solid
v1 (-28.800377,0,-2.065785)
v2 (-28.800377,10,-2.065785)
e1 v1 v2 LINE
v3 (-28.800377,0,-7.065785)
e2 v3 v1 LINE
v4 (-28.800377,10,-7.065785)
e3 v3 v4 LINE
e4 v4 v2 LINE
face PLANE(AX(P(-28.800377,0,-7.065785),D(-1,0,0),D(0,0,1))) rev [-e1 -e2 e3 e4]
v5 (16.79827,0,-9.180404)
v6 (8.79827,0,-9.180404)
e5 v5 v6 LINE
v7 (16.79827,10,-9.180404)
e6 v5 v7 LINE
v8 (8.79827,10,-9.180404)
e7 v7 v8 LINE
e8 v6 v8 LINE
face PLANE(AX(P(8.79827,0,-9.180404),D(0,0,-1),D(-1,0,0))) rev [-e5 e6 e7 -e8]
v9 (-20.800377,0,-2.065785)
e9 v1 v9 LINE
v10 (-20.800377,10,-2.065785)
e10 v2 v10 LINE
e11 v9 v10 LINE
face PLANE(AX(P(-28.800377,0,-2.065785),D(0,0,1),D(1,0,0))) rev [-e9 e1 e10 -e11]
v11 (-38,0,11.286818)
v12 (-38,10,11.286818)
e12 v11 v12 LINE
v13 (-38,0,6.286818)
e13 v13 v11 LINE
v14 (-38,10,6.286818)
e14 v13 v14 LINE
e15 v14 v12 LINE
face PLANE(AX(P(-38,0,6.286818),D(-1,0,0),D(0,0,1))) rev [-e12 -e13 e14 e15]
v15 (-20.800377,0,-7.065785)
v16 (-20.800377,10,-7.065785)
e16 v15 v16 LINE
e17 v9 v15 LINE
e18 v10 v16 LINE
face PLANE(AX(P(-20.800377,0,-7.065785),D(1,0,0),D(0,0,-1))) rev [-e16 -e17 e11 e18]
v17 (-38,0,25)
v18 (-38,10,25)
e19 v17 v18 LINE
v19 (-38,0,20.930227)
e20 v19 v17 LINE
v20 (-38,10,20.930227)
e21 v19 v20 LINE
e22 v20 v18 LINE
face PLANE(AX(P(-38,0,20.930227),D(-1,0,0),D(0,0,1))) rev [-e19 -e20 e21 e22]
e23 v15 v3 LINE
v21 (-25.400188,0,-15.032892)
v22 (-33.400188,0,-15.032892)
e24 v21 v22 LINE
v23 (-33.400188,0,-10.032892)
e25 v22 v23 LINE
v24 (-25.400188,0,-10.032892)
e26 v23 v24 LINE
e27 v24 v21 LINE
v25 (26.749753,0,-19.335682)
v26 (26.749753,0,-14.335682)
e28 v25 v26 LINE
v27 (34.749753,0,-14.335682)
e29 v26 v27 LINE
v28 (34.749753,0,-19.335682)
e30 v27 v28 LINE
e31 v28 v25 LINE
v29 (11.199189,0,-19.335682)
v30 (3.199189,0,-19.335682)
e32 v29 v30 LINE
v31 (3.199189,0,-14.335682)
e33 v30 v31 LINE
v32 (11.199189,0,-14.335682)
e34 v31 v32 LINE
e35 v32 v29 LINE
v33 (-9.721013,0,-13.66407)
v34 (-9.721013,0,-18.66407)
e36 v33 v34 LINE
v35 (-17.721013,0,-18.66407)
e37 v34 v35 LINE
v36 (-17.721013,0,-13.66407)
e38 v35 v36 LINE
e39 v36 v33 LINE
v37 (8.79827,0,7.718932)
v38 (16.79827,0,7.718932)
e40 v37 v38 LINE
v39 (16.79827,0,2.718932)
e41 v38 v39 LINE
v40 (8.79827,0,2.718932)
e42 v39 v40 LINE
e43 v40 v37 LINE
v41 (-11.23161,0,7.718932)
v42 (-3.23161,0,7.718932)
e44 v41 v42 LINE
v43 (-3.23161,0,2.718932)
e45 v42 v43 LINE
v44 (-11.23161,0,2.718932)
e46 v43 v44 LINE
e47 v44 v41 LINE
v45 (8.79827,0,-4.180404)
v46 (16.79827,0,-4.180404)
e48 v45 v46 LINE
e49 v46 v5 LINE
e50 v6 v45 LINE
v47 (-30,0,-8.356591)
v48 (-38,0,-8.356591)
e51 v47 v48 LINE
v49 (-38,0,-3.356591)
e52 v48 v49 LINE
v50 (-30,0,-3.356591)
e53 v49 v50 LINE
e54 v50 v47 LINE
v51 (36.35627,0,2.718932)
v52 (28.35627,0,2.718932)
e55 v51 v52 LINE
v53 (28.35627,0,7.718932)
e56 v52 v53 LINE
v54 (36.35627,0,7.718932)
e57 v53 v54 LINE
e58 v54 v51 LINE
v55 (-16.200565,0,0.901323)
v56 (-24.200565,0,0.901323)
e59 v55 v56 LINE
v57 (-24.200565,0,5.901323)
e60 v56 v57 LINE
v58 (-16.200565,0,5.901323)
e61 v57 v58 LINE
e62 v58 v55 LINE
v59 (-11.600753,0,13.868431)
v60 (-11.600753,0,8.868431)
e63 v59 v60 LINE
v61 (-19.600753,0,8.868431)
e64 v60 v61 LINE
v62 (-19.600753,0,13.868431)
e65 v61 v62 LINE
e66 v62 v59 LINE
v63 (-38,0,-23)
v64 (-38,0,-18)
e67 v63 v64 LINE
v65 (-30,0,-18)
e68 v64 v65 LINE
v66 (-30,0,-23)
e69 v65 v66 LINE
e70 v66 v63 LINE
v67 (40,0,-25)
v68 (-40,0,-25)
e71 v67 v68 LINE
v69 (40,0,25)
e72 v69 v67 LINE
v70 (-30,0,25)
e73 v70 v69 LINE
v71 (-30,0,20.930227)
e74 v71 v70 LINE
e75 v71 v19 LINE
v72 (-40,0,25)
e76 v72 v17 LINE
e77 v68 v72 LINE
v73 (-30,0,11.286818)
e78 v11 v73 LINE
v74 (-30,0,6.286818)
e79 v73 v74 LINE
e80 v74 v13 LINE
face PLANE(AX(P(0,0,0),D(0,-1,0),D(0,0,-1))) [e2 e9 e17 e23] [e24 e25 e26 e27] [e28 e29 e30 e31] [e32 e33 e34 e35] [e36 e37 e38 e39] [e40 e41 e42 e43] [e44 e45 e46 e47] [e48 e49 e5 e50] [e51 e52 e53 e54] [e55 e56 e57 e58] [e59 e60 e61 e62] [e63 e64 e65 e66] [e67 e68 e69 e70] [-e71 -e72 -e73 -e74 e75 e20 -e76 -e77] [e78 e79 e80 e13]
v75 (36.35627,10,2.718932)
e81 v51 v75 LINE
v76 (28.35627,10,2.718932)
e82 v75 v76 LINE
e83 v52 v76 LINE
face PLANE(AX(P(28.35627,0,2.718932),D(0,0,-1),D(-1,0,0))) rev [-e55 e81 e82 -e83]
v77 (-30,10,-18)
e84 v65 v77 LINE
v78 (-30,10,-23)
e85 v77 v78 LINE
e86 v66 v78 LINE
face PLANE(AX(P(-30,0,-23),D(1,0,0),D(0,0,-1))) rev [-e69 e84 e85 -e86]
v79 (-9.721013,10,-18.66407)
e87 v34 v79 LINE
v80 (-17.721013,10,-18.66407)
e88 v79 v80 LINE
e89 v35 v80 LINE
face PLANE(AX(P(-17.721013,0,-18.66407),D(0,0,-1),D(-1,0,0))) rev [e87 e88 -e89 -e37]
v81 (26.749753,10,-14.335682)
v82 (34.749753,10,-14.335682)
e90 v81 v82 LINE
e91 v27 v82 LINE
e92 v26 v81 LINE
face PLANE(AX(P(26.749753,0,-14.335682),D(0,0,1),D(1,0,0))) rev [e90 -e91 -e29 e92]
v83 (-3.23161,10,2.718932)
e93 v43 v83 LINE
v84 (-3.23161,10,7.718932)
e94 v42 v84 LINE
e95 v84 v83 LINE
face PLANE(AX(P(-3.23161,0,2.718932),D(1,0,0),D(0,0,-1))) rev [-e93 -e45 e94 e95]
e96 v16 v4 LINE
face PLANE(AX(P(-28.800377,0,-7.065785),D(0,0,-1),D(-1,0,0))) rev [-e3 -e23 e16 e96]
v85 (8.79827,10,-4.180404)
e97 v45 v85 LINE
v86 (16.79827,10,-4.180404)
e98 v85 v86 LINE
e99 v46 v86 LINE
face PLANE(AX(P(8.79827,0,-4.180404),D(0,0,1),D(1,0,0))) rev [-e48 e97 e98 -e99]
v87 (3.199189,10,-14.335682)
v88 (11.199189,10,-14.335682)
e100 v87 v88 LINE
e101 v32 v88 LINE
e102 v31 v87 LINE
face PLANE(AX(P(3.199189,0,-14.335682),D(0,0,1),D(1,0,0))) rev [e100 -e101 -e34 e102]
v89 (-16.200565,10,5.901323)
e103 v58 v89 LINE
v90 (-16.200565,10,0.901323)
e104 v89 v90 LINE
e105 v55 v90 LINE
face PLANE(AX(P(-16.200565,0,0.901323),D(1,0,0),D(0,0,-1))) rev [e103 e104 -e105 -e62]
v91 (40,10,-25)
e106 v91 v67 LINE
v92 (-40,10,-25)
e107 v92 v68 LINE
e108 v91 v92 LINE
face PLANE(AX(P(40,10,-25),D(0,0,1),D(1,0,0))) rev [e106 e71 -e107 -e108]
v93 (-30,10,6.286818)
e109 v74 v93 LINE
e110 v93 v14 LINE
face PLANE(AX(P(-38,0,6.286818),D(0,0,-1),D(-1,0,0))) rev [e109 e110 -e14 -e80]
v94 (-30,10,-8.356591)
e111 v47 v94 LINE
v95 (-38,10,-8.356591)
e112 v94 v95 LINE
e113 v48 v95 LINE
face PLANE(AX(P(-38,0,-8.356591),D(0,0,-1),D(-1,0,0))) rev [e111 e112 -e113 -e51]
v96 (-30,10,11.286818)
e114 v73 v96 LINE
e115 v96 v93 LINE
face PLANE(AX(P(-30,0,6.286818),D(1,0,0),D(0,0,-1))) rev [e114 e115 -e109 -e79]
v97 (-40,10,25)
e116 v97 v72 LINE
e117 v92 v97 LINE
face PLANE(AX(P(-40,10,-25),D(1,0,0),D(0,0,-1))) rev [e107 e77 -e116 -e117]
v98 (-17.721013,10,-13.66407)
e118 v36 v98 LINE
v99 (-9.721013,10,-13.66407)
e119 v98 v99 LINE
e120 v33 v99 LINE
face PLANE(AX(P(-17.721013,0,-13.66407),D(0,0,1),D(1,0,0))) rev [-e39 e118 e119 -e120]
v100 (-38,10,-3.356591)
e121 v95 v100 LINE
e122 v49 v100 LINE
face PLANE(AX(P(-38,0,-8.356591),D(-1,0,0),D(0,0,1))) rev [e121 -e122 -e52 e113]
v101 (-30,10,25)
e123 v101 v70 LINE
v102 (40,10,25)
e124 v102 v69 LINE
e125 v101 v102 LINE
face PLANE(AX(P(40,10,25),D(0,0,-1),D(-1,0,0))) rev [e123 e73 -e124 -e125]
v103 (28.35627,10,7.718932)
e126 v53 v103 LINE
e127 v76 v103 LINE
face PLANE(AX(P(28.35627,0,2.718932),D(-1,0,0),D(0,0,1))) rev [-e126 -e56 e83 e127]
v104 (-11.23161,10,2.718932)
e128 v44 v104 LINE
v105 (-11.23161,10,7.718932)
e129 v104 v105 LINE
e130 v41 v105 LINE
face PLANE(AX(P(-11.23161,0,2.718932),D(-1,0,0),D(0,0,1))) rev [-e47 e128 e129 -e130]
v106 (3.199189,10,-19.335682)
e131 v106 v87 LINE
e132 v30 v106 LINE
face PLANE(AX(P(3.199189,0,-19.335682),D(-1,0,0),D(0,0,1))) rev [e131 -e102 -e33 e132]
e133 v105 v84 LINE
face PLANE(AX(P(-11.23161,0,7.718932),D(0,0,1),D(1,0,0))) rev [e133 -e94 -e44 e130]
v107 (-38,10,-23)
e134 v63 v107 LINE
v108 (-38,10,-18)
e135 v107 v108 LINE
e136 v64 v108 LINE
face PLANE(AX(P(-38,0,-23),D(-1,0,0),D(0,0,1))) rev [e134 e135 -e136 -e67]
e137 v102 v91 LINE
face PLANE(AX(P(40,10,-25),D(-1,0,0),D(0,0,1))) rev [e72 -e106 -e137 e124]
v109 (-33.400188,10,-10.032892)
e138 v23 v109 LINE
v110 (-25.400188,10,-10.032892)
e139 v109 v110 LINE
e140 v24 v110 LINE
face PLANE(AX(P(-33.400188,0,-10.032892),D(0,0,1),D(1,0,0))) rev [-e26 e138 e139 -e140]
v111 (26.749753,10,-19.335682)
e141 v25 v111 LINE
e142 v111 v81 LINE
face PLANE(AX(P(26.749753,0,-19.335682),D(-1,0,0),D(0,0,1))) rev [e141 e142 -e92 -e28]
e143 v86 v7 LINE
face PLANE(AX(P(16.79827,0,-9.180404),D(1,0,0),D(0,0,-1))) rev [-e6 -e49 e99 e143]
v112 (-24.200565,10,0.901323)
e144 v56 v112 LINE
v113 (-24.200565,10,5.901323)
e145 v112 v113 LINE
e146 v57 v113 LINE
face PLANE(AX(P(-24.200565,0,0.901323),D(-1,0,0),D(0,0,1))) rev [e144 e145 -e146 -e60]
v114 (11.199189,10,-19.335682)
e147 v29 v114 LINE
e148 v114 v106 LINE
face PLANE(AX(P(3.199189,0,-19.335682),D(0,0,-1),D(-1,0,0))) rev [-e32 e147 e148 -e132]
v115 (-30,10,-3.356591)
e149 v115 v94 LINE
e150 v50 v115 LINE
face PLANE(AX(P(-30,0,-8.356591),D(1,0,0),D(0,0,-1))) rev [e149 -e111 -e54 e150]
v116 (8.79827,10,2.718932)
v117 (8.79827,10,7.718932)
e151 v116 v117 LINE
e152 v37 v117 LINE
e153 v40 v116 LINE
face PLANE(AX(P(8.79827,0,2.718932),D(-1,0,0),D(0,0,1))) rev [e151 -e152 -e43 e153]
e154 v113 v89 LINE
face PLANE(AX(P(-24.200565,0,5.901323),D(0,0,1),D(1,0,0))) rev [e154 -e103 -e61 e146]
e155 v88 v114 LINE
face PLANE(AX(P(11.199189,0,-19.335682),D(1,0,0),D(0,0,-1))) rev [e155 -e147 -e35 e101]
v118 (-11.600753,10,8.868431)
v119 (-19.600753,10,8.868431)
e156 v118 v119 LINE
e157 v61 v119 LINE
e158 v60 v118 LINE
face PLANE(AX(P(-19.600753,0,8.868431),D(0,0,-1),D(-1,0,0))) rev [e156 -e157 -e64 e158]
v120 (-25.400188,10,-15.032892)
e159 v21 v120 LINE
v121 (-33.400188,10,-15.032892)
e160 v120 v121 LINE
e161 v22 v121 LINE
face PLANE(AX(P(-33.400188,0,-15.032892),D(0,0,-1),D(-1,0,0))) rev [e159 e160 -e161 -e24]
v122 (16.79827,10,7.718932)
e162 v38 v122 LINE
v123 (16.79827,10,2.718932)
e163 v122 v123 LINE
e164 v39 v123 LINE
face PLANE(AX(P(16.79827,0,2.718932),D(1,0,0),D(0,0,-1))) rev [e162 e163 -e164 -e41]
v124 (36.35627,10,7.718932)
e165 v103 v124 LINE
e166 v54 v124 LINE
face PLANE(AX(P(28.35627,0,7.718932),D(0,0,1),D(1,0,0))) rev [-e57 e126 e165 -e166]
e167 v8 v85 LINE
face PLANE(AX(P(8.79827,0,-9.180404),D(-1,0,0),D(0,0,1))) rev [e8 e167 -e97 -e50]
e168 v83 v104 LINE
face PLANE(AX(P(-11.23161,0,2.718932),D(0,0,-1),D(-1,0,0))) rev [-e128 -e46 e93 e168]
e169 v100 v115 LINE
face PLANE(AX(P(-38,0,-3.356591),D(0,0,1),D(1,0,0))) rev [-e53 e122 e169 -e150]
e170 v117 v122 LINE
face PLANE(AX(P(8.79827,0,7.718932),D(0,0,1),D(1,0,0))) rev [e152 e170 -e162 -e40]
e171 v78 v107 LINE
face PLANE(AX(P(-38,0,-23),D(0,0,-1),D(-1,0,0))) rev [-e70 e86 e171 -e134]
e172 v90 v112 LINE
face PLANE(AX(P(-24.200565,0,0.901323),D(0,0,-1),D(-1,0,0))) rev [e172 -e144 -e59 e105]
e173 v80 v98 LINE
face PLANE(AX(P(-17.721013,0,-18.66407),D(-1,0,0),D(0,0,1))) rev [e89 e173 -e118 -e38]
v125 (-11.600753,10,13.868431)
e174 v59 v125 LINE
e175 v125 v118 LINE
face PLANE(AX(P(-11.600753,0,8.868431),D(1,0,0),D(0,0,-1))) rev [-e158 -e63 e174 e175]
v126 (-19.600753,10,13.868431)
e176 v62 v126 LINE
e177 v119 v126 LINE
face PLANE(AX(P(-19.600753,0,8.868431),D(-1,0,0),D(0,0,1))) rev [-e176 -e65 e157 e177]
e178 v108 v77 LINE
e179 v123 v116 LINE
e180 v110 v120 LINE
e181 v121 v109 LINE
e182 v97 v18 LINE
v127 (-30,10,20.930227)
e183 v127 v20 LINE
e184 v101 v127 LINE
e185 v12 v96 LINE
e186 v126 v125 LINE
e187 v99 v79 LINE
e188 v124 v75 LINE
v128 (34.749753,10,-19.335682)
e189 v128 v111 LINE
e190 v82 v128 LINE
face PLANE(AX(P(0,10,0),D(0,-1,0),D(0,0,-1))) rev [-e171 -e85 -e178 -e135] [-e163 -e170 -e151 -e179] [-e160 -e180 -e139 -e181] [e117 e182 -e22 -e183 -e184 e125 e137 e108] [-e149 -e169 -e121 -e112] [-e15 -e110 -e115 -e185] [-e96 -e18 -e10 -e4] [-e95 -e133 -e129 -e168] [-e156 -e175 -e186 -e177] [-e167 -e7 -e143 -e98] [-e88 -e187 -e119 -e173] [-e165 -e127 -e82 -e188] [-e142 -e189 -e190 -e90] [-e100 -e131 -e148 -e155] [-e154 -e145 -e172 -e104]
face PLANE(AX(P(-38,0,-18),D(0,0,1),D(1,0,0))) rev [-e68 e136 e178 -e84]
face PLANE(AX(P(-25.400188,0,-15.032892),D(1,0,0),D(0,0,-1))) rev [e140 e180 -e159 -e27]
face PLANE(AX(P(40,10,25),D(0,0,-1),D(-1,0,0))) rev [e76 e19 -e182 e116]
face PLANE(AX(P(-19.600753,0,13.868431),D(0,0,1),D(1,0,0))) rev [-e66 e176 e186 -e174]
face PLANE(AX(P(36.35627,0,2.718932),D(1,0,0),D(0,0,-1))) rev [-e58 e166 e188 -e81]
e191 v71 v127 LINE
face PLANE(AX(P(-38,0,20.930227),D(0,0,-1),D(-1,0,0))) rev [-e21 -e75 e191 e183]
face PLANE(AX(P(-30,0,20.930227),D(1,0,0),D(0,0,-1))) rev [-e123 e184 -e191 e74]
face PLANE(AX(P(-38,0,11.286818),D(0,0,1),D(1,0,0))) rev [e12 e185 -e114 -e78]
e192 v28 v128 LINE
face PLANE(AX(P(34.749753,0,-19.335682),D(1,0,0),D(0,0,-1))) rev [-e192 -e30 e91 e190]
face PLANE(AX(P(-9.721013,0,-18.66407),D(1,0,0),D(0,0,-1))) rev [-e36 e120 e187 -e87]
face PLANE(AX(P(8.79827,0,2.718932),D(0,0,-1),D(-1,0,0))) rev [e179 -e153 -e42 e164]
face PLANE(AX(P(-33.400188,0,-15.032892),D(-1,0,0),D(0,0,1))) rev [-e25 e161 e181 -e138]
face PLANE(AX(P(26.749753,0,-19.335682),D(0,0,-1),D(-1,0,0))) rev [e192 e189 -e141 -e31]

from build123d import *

# Parameters (mm, degrees)
SKETCH1_W               = 80
SKETCH1_H               = 50
BOSS_EXTRUDE1_DEPTH     = 10
SKETCH2_W               = 8
SKETCH2_H               = 5
CUT_EXTRUDE1_DEPTH      = 49.218253805
CRVPATTERN4_START       = -38
CRVPATTERN4_OUTLINE_W   = 10
CRVPATTERN4_OUTLINE_H   = 4.069772856
CRVPATTERN4_OUTLINE_H_2 = 5
CRVPATTERN4_DEPTH       = 8
CRVPATTERN5_COUNT       = 5
CRVPATTERN5_PITCH       = 9.199623468


# Read off the part's stored shape, not the designer's step: CrvPattern4
with BuildPart() as part:
    # Sketch1 → Boss-Extrude1 (new body)
    with BuildSketch(Plane(origin=(0, 0, 0), x_dir=(1, 0, 0), z_dir=(0, 1, 0))):
        Rectangle(SKETCH1_W, SKETCH1_H)
    extrude(amount=BOSS_EXTRUDE1_DEPTH)

    # Sketch2 → Cut-Extrude1 (cut, through all)
    with BuildSketch(Plane(origin=(0, 10, 0), x_dir=(1, 0, 0), z_dir=(0, 1, 0))):
        with Locations((-34, 20.5)):
            Rectangle(SKETCH2_W, SKETCH2_H)
    cut_extrude1 = extrude(amount=-CUT_EXTRUDE1_DEPTH, mode=Mode.SUBTRACT)

    # CrvPattern4 outline → CrvPattern4 (cut)
    with BuildSketch(Plane.YZ.offset(CRVPATTERN4_START)):
        with Locations((5, 22.965113572)):
            Rectangle(CRVPATTERN4_OUTLINE_W, CRVPATTERN4_OUTLINE_H)
        with Locations((5, 8.786818096)):
            Rectangle(CRVPATTERN4_OUTLINE_W, CRVPATTERN4_OUTLINE_H_2)
        with Locations((5, -5.856590952)):
            Rectangle(CRVPATTERN4_OUTLINE_W, CRVPATTERN4_OUTLINE_H_2)
    extrude(amount=CRVPATTERN4_DEPTH, mode=Mode.SUBTRACT)

    # CrvPattern5: Cut-Extrude1 ×5
    with Locations(*[Vector(0.4999999999066592, 0, 0.866025403838329) * (i * CRVPATTERN5_PITCH) for i in range(1, CRVPATTERN5_COUNT)]):
        add(cut_extrude1, mode=Mode.SUBTRACT)

    # Sketch-Pattern1: Cut-Extrude1 at 7 more places
    with Locations((20.278987, 0, 4.33593), (41.199189, 0, 3.664318), (64.749753, 0, 3.664318), (66.35627, 0, 25.718932), (46.79827, 0, 25.718932), (26.76839, 0, 25.718932), (46.79827, 0, 13.819596)):
        add(cut_extrude1, mode=Mode.SUBTRACT)


solid = part.part
